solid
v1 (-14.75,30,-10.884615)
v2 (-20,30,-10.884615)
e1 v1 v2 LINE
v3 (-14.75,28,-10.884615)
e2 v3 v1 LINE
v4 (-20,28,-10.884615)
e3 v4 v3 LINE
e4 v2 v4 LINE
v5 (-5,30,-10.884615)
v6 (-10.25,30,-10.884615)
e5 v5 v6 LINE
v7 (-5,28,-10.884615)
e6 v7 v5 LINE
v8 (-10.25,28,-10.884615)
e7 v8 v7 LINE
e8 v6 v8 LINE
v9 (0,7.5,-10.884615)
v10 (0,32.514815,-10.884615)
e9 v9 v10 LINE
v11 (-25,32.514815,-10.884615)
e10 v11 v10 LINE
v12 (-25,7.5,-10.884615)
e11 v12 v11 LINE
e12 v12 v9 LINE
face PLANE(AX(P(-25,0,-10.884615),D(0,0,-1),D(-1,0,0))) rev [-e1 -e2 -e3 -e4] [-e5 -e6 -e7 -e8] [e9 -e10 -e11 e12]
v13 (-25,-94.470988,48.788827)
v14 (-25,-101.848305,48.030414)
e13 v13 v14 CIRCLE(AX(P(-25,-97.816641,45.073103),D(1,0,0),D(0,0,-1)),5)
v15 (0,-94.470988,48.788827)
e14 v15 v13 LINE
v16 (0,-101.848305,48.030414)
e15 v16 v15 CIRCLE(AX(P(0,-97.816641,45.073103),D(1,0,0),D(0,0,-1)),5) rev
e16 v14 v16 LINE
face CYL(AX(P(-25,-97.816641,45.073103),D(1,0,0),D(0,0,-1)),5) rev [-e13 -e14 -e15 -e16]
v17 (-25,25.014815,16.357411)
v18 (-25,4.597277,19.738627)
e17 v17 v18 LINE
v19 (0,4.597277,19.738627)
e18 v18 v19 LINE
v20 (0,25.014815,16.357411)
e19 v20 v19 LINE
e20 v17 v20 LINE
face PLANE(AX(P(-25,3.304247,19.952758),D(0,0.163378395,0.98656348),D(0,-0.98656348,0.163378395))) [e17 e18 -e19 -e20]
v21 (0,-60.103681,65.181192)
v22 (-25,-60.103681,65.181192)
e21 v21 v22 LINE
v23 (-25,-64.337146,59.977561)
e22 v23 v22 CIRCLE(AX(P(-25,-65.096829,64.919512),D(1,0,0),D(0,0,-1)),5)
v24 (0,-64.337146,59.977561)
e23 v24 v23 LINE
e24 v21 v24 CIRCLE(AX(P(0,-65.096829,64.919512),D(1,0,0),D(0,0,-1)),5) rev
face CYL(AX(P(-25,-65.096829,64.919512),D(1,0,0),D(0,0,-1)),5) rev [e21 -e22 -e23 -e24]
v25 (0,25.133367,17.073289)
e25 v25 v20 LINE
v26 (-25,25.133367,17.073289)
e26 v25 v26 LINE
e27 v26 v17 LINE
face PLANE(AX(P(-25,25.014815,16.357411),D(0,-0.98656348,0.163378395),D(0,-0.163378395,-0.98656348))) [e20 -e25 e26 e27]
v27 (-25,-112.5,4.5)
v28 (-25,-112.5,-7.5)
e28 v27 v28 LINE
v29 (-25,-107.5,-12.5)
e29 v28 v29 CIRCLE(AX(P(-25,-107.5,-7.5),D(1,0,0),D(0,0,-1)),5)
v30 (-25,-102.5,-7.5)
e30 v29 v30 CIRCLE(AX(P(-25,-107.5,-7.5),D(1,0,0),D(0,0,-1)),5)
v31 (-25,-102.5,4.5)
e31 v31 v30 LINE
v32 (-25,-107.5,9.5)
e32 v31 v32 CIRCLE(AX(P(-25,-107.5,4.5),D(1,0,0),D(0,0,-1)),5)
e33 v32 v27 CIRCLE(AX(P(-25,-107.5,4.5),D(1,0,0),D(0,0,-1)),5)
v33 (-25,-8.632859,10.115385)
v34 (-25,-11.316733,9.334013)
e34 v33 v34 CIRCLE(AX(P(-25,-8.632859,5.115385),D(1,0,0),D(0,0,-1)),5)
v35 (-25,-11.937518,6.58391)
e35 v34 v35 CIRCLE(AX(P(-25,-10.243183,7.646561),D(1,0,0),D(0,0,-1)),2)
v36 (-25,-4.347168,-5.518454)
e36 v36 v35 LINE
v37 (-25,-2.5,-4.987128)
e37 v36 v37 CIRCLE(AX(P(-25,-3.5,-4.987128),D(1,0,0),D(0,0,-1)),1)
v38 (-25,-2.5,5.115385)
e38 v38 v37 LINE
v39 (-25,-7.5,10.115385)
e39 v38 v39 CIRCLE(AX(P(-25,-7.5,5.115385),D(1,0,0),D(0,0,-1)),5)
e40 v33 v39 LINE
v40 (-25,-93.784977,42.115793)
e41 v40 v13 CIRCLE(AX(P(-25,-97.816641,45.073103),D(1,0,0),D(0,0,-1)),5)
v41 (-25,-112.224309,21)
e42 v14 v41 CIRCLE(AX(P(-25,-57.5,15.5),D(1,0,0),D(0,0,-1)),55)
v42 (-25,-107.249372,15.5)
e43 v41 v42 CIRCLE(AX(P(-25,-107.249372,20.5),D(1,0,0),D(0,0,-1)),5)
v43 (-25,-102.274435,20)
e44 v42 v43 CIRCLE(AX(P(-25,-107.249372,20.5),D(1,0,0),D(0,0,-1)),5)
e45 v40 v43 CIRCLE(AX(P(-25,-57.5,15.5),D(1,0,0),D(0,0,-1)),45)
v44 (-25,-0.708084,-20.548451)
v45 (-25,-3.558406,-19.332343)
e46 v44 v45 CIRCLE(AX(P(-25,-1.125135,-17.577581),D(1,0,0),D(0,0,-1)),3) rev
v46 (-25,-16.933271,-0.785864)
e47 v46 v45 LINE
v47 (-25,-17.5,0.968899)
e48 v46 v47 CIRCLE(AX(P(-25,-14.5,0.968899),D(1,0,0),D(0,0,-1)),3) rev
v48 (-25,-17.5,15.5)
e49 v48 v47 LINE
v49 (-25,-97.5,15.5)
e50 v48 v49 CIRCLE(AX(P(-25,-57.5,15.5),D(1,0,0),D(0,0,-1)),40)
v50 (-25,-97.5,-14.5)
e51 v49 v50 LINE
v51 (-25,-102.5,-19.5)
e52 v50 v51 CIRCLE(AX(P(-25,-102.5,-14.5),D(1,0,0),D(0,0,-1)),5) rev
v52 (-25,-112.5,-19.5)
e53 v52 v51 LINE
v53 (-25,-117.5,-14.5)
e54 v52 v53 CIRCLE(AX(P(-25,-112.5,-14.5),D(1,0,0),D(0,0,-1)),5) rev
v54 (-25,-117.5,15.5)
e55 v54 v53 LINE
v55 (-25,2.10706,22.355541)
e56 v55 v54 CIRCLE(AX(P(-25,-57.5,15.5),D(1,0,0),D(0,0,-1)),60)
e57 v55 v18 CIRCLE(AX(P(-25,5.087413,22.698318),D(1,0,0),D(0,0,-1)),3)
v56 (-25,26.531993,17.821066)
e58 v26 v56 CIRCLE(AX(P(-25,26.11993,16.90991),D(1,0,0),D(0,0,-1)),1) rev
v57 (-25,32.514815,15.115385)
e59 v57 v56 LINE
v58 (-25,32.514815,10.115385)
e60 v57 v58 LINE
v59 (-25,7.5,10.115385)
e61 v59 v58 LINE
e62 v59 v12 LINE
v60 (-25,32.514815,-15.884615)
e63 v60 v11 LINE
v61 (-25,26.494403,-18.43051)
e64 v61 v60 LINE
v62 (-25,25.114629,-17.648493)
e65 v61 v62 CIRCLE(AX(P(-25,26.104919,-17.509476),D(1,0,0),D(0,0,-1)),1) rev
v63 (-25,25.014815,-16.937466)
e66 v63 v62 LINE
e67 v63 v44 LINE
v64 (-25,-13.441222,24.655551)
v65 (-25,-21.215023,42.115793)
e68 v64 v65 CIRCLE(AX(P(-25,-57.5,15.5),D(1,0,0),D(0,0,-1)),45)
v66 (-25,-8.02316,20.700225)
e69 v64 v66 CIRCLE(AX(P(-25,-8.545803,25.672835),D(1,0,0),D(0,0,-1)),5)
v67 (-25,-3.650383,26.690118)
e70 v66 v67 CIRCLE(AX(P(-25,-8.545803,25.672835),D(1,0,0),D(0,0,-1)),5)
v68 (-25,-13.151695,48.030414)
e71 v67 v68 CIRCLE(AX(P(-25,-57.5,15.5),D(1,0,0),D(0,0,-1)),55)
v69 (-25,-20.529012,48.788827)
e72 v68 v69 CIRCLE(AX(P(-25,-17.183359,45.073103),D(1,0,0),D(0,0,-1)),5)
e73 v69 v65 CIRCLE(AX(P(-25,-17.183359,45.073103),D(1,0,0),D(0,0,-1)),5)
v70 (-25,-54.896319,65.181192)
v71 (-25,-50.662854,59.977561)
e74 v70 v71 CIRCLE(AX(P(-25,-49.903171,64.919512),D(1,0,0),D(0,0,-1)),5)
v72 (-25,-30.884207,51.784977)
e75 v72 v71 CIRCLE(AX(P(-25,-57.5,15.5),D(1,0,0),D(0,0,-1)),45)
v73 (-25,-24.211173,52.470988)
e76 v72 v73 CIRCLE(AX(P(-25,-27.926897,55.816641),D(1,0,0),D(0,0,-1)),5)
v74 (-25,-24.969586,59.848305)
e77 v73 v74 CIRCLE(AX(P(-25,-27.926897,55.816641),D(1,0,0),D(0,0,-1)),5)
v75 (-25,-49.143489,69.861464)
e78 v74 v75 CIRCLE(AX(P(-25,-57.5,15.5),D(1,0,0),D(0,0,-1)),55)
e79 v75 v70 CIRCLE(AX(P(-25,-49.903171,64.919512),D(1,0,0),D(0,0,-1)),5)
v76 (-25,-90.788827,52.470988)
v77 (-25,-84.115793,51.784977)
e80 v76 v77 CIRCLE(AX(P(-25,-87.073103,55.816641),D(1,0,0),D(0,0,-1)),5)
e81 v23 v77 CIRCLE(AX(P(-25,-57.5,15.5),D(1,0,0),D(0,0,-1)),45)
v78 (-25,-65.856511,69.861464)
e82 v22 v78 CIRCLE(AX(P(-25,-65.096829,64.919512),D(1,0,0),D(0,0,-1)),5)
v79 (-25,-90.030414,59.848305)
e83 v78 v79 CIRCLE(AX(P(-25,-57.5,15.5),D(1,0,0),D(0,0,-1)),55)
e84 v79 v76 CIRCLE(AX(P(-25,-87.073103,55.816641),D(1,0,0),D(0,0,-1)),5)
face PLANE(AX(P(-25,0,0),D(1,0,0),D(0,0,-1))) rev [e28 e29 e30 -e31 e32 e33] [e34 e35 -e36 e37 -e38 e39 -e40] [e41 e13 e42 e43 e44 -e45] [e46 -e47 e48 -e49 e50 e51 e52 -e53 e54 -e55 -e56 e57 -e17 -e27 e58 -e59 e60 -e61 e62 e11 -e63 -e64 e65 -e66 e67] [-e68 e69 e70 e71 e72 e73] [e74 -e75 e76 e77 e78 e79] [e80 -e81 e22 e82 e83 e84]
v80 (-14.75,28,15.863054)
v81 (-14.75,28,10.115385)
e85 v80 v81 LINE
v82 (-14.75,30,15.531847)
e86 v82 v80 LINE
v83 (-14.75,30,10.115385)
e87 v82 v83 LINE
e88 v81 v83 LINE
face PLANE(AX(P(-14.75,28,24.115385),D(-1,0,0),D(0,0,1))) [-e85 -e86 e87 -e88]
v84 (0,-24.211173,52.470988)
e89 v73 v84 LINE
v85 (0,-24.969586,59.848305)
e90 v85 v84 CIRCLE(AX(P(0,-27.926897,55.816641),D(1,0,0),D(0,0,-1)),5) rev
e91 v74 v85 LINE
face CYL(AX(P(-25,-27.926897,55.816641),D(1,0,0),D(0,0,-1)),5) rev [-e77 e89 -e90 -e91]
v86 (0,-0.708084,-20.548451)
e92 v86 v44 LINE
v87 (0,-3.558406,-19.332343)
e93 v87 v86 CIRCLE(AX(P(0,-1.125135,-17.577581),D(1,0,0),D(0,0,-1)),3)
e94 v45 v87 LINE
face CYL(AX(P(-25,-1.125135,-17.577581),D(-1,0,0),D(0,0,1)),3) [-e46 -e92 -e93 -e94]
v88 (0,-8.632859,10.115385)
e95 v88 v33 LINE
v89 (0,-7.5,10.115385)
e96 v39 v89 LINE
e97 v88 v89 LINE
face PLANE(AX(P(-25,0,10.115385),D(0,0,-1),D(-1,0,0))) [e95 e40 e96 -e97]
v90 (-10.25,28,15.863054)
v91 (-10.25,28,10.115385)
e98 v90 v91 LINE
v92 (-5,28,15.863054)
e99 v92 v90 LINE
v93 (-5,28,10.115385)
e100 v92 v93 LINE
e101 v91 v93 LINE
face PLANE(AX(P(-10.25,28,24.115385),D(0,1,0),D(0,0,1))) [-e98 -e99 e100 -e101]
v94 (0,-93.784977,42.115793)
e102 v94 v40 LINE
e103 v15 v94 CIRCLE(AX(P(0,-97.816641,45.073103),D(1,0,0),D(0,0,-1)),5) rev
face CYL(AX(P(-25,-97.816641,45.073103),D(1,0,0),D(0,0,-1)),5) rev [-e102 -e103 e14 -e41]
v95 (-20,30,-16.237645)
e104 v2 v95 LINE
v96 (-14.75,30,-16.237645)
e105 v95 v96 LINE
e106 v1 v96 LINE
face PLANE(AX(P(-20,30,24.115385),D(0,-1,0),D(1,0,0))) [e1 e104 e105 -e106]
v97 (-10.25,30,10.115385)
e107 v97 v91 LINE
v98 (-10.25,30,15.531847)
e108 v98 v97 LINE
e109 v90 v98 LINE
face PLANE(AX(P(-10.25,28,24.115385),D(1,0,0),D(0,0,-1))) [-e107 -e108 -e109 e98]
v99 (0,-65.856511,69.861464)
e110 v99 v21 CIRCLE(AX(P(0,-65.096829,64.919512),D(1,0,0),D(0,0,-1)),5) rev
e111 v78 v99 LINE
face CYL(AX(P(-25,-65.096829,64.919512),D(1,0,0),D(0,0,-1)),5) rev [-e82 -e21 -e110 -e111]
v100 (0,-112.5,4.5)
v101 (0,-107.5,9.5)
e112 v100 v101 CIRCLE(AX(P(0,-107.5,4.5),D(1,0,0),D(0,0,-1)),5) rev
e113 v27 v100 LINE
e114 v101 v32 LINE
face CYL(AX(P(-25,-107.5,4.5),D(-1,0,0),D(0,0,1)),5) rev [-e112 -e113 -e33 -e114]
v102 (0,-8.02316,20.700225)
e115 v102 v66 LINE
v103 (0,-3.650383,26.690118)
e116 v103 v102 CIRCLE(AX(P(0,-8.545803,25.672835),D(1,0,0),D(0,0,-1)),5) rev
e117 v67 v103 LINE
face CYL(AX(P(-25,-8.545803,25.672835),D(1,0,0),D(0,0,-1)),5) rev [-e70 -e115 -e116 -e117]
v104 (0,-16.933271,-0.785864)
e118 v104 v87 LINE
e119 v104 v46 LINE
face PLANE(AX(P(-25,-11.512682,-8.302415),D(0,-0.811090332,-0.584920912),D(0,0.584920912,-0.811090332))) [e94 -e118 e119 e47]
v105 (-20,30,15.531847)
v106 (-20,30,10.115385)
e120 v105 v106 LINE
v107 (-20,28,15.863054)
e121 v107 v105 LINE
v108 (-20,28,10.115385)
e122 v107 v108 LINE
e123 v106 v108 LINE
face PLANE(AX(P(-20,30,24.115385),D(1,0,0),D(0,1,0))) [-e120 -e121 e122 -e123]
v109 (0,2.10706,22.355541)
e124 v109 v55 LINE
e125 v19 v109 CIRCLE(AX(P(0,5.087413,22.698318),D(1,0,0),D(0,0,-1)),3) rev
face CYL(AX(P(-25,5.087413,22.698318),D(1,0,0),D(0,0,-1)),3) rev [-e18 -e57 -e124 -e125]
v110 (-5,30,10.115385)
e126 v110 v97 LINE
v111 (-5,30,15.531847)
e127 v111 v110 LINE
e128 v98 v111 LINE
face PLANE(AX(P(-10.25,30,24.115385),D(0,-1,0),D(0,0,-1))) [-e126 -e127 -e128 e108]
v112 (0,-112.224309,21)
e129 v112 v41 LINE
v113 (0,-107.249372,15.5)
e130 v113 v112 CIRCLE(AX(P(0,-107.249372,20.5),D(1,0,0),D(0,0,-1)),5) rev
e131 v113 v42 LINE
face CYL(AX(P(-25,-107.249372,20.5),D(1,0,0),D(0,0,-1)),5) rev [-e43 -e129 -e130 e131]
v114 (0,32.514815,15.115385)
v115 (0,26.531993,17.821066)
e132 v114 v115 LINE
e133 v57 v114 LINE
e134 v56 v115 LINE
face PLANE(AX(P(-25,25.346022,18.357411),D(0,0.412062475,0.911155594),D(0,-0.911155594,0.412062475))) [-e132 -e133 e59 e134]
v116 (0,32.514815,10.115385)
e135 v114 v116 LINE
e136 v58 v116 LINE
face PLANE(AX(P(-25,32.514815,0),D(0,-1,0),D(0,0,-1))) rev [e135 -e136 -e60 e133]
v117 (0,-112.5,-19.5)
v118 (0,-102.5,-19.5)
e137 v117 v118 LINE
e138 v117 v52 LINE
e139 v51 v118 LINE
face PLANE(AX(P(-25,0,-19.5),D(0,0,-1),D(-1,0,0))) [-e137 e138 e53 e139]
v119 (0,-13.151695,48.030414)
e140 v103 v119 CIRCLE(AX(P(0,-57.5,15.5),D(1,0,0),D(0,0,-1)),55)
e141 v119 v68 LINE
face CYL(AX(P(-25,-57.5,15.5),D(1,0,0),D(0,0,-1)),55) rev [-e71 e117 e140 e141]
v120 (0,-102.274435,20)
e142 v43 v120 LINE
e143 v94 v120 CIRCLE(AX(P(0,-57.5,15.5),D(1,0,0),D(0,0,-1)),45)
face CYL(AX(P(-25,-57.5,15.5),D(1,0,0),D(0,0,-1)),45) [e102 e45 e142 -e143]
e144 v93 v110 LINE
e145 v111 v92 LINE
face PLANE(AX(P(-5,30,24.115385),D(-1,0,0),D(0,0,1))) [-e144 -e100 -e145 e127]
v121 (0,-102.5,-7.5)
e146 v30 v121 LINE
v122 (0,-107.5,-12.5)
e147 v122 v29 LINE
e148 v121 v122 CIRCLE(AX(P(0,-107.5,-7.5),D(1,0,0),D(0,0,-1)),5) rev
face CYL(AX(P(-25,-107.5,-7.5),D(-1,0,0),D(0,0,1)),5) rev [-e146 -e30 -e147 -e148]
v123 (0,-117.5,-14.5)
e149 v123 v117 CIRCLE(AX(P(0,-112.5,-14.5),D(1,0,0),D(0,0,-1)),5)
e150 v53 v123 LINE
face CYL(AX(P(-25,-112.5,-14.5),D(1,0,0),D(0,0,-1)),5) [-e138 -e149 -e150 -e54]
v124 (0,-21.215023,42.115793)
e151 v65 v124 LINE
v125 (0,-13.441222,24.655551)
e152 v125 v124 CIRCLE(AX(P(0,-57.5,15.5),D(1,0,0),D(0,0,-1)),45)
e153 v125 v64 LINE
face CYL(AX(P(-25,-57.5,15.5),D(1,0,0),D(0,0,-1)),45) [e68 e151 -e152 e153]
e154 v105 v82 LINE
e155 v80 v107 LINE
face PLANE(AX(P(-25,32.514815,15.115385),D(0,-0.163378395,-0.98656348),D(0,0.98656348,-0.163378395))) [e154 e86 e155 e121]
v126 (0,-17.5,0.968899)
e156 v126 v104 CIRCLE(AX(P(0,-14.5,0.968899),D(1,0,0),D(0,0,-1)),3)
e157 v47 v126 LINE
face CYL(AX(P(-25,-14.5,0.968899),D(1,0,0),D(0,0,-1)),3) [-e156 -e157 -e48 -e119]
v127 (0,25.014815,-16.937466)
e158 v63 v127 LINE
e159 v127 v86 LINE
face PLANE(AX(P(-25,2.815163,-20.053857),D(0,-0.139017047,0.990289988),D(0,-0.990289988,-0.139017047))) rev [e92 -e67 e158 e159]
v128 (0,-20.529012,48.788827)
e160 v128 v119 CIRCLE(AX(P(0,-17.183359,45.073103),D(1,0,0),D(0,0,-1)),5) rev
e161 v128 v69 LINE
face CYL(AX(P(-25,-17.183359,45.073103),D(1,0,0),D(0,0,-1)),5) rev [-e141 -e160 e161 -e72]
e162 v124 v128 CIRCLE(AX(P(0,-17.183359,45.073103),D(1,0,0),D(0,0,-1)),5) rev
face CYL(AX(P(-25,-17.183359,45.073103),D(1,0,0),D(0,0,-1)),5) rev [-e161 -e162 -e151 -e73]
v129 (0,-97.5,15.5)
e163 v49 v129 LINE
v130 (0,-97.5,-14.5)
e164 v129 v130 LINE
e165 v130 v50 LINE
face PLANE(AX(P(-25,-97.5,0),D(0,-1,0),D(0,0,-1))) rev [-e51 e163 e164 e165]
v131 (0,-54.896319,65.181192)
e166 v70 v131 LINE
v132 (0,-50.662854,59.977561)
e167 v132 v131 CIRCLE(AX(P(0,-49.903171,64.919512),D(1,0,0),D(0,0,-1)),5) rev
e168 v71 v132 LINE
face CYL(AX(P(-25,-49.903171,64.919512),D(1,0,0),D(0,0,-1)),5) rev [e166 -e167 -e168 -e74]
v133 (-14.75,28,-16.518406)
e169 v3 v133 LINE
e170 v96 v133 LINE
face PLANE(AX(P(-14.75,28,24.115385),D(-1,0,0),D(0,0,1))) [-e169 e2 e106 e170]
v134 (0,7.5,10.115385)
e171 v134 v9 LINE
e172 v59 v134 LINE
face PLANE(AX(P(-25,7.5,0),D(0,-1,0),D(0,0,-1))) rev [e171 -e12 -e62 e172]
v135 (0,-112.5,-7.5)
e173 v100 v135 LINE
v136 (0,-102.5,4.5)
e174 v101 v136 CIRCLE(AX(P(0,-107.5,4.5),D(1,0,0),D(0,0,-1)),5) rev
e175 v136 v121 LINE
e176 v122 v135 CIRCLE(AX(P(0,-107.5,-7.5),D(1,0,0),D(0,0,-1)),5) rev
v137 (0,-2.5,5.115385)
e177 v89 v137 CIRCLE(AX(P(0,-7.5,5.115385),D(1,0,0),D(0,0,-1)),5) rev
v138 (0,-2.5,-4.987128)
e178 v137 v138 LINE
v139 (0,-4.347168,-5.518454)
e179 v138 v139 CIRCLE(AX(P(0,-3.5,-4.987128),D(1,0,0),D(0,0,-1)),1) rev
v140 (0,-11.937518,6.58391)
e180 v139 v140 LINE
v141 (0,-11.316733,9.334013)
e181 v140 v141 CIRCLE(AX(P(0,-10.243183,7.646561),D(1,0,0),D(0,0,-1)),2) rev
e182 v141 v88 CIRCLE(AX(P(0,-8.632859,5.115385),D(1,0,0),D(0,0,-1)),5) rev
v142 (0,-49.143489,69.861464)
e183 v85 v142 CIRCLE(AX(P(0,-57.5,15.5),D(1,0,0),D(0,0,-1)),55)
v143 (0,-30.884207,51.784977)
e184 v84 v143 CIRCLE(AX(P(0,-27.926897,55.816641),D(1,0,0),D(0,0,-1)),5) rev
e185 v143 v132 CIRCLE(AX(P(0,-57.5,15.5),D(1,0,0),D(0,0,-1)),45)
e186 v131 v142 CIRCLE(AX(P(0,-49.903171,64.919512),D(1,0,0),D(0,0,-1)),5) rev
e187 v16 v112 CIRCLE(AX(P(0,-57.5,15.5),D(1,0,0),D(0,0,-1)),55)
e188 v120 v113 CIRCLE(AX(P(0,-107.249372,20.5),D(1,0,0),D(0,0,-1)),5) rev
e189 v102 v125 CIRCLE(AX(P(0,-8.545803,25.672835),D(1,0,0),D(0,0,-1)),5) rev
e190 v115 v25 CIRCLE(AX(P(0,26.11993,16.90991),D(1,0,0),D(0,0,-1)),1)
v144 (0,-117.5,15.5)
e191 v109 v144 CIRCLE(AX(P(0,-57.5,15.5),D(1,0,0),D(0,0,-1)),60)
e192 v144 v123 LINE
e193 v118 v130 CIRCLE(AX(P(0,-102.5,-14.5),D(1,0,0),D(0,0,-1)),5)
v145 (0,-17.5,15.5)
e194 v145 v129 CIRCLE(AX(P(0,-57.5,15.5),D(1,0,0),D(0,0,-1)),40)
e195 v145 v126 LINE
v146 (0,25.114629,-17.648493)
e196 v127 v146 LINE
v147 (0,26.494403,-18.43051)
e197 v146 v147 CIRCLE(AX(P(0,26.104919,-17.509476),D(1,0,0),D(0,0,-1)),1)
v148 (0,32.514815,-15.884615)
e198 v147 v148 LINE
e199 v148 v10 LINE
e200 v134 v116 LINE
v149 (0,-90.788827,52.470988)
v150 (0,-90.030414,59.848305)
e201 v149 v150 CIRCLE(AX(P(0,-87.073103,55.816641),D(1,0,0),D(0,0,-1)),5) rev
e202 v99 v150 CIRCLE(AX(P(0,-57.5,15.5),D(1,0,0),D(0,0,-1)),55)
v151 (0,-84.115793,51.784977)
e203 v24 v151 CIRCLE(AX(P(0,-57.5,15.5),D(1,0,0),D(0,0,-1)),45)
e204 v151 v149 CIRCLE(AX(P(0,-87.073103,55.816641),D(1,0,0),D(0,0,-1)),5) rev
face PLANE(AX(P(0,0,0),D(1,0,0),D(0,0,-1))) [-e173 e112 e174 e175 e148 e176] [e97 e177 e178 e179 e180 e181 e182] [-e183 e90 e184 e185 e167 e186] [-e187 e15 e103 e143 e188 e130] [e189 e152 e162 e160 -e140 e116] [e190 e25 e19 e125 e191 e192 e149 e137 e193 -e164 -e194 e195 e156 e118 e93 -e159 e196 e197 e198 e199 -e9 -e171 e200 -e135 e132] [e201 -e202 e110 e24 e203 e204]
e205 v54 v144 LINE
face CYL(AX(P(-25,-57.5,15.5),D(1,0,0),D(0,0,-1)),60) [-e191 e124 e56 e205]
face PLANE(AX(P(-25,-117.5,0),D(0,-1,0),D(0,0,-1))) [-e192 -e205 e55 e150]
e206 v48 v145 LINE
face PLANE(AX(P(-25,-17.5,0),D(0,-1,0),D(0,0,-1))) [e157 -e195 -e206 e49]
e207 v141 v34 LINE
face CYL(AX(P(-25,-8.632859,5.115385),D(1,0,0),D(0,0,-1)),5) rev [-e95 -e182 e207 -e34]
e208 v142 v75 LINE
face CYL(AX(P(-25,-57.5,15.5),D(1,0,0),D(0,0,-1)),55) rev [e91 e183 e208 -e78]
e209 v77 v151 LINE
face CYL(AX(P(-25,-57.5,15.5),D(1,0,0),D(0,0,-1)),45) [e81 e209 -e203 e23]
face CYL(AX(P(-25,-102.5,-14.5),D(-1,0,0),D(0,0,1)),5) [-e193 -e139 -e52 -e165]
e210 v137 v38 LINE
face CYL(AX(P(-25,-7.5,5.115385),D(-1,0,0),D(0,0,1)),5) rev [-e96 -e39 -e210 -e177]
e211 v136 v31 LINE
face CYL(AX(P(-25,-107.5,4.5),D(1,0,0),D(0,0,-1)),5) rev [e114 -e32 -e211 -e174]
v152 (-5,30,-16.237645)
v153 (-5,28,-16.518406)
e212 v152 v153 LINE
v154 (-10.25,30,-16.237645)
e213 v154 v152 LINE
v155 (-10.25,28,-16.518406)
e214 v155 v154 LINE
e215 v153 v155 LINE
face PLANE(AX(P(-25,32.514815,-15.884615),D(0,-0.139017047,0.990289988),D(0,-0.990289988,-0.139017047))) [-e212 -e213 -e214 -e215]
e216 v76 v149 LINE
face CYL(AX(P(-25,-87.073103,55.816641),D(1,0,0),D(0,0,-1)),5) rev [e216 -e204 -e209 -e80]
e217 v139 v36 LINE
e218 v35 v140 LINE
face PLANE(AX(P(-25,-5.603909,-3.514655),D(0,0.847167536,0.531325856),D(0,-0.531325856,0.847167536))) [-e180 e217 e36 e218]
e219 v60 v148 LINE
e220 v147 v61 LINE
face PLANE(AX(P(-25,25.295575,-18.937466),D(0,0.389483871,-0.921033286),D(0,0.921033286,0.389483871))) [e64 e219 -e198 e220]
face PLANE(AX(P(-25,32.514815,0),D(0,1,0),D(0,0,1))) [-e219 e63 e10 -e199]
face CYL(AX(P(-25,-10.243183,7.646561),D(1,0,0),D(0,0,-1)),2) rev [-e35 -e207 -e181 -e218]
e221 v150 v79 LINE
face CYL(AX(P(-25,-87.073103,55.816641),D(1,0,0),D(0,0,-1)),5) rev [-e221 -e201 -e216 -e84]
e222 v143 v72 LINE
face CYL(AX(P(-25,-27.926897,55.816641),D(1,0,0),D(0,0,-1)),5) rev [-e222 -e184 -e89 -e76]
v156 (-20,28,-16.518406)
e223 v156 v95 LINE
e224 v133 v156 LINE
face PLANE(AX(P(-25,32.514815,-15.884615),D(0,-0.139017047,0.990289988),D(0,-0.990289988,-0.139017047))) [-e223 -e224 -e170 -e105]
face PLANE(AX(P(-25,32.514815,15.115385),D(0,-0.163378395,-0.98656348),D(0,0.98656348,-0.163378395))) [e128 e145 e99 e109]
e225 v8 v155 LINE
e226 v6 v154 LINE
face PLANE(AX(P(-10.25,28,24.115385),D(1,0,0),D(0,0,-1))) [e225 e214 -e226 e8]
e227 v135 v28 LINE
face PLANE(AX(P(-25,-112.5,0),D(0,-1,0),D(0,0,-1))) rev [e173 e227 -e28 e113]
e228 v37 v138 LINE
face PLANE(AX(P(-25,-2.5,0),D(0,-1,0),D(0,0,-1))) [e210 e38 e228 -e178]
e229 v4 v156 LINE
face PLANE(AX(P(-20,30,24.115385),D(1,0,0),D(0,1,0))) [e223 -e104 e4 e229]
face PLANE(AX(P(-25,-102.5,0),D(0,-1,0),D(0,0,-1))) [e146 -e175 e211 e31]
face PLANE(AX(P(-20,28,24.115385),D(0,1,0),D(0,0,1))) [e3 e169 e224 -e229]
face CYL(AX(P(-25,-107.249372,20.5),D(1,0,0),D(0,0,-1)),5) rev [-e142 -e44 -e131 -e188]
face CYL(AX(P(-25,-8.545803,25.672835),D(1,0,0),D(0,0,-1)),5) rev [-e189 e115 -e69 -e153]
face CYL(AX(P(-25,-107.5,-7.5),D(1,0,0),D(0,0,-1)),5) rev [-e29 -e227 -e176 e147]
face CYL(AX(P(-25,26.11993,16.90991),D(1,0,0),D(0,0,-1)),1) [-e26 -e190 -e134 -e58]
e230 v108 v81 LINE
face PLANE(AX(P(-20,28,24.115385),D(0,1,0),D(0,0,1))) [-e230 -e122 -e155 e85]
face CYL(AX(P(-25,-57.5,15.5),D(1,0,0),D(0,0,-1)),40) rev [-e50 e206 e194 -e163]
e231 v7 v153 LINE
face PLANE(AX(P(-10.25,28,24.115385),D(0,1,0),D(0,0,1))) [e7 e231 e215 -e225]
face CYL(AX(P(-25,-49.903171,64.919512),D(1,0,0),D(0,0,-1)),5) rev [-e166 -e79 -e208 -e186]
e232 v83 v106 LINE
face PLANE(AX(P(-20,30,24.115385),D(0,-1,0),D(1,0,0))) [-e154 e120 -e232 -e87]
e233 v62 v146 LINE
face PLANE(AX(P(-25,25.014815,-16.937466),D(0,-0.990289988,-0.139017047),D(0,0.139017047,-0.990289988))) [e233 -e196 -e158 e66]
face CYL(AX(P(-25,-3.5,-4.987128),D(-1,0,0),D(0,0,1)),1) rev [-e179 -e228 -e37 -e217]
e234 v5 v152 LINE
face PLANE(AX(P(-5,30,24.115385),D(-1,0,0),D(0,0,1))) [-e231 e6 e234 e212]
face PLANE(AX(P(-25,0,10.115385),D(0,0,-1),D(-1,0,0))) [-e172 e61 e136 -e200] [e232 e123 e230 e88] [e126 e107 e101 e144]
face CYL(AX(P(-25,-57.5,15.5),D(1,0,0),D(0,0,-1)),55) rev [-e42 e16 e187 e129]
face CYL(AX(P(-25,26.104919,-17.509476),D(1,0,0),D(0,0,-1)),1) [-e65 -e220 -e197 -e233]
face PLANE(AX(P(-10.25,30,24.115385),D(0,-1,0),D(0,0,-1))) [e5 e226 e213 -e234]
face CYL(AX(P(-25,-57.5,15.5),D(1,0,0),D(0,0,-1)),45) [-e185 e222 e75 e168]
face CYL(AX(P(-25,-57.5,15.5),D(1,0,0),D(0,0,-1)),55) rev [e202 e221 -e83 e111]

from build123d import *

# Parameters (mm, degrees)
SKETCH1_W               = 22
SKETCH1_H               = 10
BOSS_EXTRUDE1_DEPTH     = 25
FILLET1_R               = 5
FILLET2_R               = 5
FILLET3_R               = 5
FILLET4_R               = 5
FILLET5_R               = 2
FILLET6_R               = 1
FILLET7_R               = 3
FILLET8_R               = 5
CUT_EXTRUDE1_DEPTH      = 35
CUT_EXTRUDE1_DEPTH_BACK = 25
SKETCH2_W               = 5.25
SKETCH2_H               = 2
BOSS_EXTRUDE2_DEPTH     = 25
FILLET9_R               = 1


# Some blends are built 0.0001 mm under size
with BuildPart() as part:
    # Sketch1 → Boss-Extrude1 (new body)
    with BuildSketch(Plane(origin=(0, 0, 0), x_dir=(0, 0, -1), z_dir=(1, 0, 0))):
        with BuildLine():
            ThreePointArc((-15.5, -17.5), (-55.5, -57.5), (-15.5, -97.5))
            Line((-15.5, -97.5), (19.5, -97.5))
            Line((19.5, -97.5), (19.5, -117.5))
            Line((19.5, -117.5), (-15.5, -117.5))
            ThreePointArc((-15.5, -117.5), (-75.455538985, -59.809403615), (-20.115384615, 2.322221831))
            Line((-20.115384615, 2.322221831), (-15.115384615, 32.514814847))
            Line((-15.115384615, 32.514814847), (-10.115384615, 32.514814847))
            Line((-10.115384615, 32.514814847), (-10.115384615, 7.5))
            Line((-10.115384615, 7.5), (10.884615385, 7.5))
            Line((10.884615385, 7.5), (10.884615385, 32.514814847))
            Line((10.884615385, 32.514814847), (15.884615385, 32.514814847))
            Line((15.884615385, 32.514814847), (20.8, -2.5))
            Line((20.8, -2.5), (0, -17.5))
            Line((0, -17.5), (-15.5, -17.5))
        make_face()
        with BuildLine():
            ThreePointArc((-52.30218335, -98.372965401), (-35.210237225, -108.846923457), (-15.5, -112.5))
            Line((-15.5, -112.5), (-15.5, -102.5))
            ThreePointArc((-15.5, -102.5), (-31.62655773, -99.511119192), (-45.610877286, -90.941517146))
            Line((-45.610877286, -90.941517146), (-52.30218335, -98.372965401))
        make_face(mode=Mode.SUBTRACT)
        with BuildLine():
            ThreePointArc((-56.372965401, -20.69781665), (-66.313374288, -36.45241122), (-70.424624412, -54.621522407))
            Line((-70.424624412, -54.621522407), (-60.438329064, -55.144881969))
            ThreePointArc((-60.438329064, -55.144881969), (-57.074578963, -40.279245544), (-48.941517146, -27.389122714))
            Line((-48.941517146, -27.389122714), (-56.372965401, -20.69781665))
        make_face(mode=Mode.SUBTRACT)
        with BuildLine():
            ThreePointArc((-21.24906548, -2.801295755), (-37.870515369, -7.25499983), (-52.30218335, -16.627034599))
            Line((-52.30218335, -16.627034599), (-45.610877286, -24.058482854))
            ThreePointArc((-45.610877286, -24.058482854), (-33.803148938, -16.390454406), (-20.203780847, -12.746514708))
            Line((-20.203780847, -12.746514708), (-21.24906548, -2.801295755))
        make_face(mode=Mode.SUBTRACT)
        Polygon((8.463652775, -2.5), (-7.917479229, -12.773905232), (-10.115384615, -12.773905232), (-10.115384615, -2.5), align=None, mode=Mode.SUBTRACT)
        with Locations((1.5, -107.5)):
            Rectangle(SKETCH1_W, SKETCH1_H, mode=Mode.SUBTRACT)
        with BuildLine():
            Line((-60.438329064, -59.855118031), (-70.424624412, -60.378477593))
            ThreePointArc((-70.424624412, -60.378477593), (-66.313374288, -78.54758878), (-56.372965401, -94.30218335))
            Line((-56.372965401, -94.30218335), (-48.941517146, -87.610877286))
            ThreePointArc((-48.941517146, -87.610877286), (-57.074578963, -74.720754456), (-60.438329064, -59.855118031))
        make_face(mode=Mode.SUBTRACT)
    extrude(amount=-BOSS_EXTRUDE1_DEPTH)

    # Fillet1
    fillet1_edges = [part.edges().sort_by_distance(p)[0] for p in [
        (-12.5, -90.941517146, 45.610877286),
        (-12.5, -102.5, 9.5),
        (-12.5, -112.5, 9.5),
        (-12.5, -112.5, 15.5),
        (-12.5, -112.5, -12.5),
        (-12.5, -102.5, -12.5),
        (-12.5, -98.372965401, 52.30218335),
        (-12.5, -102.5, 15.5),
        (-12.5, -87.610877286, 48.941517146),
        (-12.5, -94.30218335, 56.372965401),
        (-12.5, -20.69781665, 56.372965401),
        (-12.5, -27.389122714, 48.941517146),
        (-12.5, -55.144881969, 60.438329064),
        (-12.5, -54.621522407, 70.424624412),
        (-12.5, -16.627034599, 52.30218335),
        (-12.5, -24.058482854, 45.610877286),
        (-12.5, -12.746514708, 20.203780847),
        (-12.5, -2.801295755, 21.24906548),
    ]]
    fillet(fillet1_edges, radius=FILLET1_R - 0.0001)  # a hair under: the kernel refuses the full size

    # Fillet2
    fillet2_edges = [part.edges().sort_by_distance(p)[0] for p in [
        (-12.5, -59.855118031, 60.438329064),
        (-12.5, -60.378477593, 70.424624412),
    ]]
    fillet(fillet2_edges, radius=FILLET2_R - 0.0001)  # a hair under: the kernel refuses the full size

    # Fillet3
    fillet3_edges = [part.edges().sort_by_distance(p)[0] for p in [
        (-12.5, -2.5, 10.115384615),
    ]]
    fillet(fillet3_edges, radius=FILLET3_R)

    # Fillet4
    # the kernel refuses this fillet: 5 mm, written as the material it adds along each edge
    with BuildSketch(Plane(origin=(0, -12.773905232, 10.115384615), x_dir=(0, 1, 0), z_dir=(-1, 0, 0))) as fillet4_piece_1:
        with BuildLine():
            CenterArc((4.141046459, 5), FILLET4_R, 214.08477399, 55.91522601)
            Line((0, 2.197905387), (-0.082820929, 2.141863494))
            ThreePointArc((-0.082820929, 2.141863494), (-0.1, 1.098952693), (-0.1, 0))
            Line((-0.1, 0), (0, -0.1))
            Line((0, -0.1), (4.141046459, -0.1))
            Line((4.141046459, -0.1), (4.141046459, 0))
        make_face()
    extrude(amount=25)

    # Fillet5
    fillet5_edges = [part.edges().sort_by_distance(p)[0] for p in [
        (-12.5, -12.773905232, 7.917479229),
    ]]
    fillet(fillet5_edges, radius=FILLET5_R)

    # Fillet6
    fillet6_edges = [part.edges().sort_by_distance(p)[0] for p in [
        (-12.5, -2.5, -8.463652775),
    ]]
    fillet(fillet6_edges, radius=FILLET6_R)

    # Fillet7
    fillet7_edges = [part.edges().sort_by_distance(p)[0] for p in [
        (-12.5, 2.322221831, 20.115384615),
        (-12.5, -2.5, -20.8),
        (-12.5, -17.5, 0),
    ]]
    fillet(fillet7_edges, radius=FILLET7_R)

    # Fillet8
    fillet8_edges = [part.edges().sort_by_distance(p)[0] for p in [
        (-12.5, -97.5, -19.5),
        (-12.5, -117.5, -19.5),
    ]]
    fillet(fillet8_edges, radius=FILLET8_R)

    # Sketch2 → Cut-Extrude1 (cut, two sides: drawn at the far end of the back side and taken through both)
    with BuildSketch(Plane.XY.offset(-10.884615385).offset(-CUT_EXTRUDE1_DEPTH_BACK)):
        with Locations((-17.375, 29)):
            Rectangle(SKETCH2_W, SKETCH2_H)
        with Locations((-7.625, 29)):
            Rectangle(SKETCH2_W, SKETCH2_H)
    extrude(amount=CUT_EXTRUDE1_DEPTH + CUT_EXTRUDE1_DEPTH_BACK, mode=Mode.SUBTRACT)

    # Sketch3 → Boss-Extrude2 (add)
    with BuildSketch(Plane(origin=(0, 0, 0), x_dir=(0, 0, -1), z_dir=(1, 0, 0))):
        Polygon((16.937466436, 25.014814847), (18.937466436, 25.295575128), (15.884615385, 32.514814847), align=None)
        Polygon((-16.357411095, 25.014814847), (-18.357411095, 25.346021908), (-15.115384615, 32.514814847), align=None)
    extrude(amount=-BOSS_EXTRUDE2_DEPTH)

    # Fillet9
    fillet9_edges = [part.edges().sort_by_distance(p)[0] for p in [
        (-12.5, 25.295575128, -18.937466436),
        (-12.5, 25.346021908, 18.357411095),
    ]]
    fillet(fillet9_edges, radius=FILLET9_R)


solid = part.part
